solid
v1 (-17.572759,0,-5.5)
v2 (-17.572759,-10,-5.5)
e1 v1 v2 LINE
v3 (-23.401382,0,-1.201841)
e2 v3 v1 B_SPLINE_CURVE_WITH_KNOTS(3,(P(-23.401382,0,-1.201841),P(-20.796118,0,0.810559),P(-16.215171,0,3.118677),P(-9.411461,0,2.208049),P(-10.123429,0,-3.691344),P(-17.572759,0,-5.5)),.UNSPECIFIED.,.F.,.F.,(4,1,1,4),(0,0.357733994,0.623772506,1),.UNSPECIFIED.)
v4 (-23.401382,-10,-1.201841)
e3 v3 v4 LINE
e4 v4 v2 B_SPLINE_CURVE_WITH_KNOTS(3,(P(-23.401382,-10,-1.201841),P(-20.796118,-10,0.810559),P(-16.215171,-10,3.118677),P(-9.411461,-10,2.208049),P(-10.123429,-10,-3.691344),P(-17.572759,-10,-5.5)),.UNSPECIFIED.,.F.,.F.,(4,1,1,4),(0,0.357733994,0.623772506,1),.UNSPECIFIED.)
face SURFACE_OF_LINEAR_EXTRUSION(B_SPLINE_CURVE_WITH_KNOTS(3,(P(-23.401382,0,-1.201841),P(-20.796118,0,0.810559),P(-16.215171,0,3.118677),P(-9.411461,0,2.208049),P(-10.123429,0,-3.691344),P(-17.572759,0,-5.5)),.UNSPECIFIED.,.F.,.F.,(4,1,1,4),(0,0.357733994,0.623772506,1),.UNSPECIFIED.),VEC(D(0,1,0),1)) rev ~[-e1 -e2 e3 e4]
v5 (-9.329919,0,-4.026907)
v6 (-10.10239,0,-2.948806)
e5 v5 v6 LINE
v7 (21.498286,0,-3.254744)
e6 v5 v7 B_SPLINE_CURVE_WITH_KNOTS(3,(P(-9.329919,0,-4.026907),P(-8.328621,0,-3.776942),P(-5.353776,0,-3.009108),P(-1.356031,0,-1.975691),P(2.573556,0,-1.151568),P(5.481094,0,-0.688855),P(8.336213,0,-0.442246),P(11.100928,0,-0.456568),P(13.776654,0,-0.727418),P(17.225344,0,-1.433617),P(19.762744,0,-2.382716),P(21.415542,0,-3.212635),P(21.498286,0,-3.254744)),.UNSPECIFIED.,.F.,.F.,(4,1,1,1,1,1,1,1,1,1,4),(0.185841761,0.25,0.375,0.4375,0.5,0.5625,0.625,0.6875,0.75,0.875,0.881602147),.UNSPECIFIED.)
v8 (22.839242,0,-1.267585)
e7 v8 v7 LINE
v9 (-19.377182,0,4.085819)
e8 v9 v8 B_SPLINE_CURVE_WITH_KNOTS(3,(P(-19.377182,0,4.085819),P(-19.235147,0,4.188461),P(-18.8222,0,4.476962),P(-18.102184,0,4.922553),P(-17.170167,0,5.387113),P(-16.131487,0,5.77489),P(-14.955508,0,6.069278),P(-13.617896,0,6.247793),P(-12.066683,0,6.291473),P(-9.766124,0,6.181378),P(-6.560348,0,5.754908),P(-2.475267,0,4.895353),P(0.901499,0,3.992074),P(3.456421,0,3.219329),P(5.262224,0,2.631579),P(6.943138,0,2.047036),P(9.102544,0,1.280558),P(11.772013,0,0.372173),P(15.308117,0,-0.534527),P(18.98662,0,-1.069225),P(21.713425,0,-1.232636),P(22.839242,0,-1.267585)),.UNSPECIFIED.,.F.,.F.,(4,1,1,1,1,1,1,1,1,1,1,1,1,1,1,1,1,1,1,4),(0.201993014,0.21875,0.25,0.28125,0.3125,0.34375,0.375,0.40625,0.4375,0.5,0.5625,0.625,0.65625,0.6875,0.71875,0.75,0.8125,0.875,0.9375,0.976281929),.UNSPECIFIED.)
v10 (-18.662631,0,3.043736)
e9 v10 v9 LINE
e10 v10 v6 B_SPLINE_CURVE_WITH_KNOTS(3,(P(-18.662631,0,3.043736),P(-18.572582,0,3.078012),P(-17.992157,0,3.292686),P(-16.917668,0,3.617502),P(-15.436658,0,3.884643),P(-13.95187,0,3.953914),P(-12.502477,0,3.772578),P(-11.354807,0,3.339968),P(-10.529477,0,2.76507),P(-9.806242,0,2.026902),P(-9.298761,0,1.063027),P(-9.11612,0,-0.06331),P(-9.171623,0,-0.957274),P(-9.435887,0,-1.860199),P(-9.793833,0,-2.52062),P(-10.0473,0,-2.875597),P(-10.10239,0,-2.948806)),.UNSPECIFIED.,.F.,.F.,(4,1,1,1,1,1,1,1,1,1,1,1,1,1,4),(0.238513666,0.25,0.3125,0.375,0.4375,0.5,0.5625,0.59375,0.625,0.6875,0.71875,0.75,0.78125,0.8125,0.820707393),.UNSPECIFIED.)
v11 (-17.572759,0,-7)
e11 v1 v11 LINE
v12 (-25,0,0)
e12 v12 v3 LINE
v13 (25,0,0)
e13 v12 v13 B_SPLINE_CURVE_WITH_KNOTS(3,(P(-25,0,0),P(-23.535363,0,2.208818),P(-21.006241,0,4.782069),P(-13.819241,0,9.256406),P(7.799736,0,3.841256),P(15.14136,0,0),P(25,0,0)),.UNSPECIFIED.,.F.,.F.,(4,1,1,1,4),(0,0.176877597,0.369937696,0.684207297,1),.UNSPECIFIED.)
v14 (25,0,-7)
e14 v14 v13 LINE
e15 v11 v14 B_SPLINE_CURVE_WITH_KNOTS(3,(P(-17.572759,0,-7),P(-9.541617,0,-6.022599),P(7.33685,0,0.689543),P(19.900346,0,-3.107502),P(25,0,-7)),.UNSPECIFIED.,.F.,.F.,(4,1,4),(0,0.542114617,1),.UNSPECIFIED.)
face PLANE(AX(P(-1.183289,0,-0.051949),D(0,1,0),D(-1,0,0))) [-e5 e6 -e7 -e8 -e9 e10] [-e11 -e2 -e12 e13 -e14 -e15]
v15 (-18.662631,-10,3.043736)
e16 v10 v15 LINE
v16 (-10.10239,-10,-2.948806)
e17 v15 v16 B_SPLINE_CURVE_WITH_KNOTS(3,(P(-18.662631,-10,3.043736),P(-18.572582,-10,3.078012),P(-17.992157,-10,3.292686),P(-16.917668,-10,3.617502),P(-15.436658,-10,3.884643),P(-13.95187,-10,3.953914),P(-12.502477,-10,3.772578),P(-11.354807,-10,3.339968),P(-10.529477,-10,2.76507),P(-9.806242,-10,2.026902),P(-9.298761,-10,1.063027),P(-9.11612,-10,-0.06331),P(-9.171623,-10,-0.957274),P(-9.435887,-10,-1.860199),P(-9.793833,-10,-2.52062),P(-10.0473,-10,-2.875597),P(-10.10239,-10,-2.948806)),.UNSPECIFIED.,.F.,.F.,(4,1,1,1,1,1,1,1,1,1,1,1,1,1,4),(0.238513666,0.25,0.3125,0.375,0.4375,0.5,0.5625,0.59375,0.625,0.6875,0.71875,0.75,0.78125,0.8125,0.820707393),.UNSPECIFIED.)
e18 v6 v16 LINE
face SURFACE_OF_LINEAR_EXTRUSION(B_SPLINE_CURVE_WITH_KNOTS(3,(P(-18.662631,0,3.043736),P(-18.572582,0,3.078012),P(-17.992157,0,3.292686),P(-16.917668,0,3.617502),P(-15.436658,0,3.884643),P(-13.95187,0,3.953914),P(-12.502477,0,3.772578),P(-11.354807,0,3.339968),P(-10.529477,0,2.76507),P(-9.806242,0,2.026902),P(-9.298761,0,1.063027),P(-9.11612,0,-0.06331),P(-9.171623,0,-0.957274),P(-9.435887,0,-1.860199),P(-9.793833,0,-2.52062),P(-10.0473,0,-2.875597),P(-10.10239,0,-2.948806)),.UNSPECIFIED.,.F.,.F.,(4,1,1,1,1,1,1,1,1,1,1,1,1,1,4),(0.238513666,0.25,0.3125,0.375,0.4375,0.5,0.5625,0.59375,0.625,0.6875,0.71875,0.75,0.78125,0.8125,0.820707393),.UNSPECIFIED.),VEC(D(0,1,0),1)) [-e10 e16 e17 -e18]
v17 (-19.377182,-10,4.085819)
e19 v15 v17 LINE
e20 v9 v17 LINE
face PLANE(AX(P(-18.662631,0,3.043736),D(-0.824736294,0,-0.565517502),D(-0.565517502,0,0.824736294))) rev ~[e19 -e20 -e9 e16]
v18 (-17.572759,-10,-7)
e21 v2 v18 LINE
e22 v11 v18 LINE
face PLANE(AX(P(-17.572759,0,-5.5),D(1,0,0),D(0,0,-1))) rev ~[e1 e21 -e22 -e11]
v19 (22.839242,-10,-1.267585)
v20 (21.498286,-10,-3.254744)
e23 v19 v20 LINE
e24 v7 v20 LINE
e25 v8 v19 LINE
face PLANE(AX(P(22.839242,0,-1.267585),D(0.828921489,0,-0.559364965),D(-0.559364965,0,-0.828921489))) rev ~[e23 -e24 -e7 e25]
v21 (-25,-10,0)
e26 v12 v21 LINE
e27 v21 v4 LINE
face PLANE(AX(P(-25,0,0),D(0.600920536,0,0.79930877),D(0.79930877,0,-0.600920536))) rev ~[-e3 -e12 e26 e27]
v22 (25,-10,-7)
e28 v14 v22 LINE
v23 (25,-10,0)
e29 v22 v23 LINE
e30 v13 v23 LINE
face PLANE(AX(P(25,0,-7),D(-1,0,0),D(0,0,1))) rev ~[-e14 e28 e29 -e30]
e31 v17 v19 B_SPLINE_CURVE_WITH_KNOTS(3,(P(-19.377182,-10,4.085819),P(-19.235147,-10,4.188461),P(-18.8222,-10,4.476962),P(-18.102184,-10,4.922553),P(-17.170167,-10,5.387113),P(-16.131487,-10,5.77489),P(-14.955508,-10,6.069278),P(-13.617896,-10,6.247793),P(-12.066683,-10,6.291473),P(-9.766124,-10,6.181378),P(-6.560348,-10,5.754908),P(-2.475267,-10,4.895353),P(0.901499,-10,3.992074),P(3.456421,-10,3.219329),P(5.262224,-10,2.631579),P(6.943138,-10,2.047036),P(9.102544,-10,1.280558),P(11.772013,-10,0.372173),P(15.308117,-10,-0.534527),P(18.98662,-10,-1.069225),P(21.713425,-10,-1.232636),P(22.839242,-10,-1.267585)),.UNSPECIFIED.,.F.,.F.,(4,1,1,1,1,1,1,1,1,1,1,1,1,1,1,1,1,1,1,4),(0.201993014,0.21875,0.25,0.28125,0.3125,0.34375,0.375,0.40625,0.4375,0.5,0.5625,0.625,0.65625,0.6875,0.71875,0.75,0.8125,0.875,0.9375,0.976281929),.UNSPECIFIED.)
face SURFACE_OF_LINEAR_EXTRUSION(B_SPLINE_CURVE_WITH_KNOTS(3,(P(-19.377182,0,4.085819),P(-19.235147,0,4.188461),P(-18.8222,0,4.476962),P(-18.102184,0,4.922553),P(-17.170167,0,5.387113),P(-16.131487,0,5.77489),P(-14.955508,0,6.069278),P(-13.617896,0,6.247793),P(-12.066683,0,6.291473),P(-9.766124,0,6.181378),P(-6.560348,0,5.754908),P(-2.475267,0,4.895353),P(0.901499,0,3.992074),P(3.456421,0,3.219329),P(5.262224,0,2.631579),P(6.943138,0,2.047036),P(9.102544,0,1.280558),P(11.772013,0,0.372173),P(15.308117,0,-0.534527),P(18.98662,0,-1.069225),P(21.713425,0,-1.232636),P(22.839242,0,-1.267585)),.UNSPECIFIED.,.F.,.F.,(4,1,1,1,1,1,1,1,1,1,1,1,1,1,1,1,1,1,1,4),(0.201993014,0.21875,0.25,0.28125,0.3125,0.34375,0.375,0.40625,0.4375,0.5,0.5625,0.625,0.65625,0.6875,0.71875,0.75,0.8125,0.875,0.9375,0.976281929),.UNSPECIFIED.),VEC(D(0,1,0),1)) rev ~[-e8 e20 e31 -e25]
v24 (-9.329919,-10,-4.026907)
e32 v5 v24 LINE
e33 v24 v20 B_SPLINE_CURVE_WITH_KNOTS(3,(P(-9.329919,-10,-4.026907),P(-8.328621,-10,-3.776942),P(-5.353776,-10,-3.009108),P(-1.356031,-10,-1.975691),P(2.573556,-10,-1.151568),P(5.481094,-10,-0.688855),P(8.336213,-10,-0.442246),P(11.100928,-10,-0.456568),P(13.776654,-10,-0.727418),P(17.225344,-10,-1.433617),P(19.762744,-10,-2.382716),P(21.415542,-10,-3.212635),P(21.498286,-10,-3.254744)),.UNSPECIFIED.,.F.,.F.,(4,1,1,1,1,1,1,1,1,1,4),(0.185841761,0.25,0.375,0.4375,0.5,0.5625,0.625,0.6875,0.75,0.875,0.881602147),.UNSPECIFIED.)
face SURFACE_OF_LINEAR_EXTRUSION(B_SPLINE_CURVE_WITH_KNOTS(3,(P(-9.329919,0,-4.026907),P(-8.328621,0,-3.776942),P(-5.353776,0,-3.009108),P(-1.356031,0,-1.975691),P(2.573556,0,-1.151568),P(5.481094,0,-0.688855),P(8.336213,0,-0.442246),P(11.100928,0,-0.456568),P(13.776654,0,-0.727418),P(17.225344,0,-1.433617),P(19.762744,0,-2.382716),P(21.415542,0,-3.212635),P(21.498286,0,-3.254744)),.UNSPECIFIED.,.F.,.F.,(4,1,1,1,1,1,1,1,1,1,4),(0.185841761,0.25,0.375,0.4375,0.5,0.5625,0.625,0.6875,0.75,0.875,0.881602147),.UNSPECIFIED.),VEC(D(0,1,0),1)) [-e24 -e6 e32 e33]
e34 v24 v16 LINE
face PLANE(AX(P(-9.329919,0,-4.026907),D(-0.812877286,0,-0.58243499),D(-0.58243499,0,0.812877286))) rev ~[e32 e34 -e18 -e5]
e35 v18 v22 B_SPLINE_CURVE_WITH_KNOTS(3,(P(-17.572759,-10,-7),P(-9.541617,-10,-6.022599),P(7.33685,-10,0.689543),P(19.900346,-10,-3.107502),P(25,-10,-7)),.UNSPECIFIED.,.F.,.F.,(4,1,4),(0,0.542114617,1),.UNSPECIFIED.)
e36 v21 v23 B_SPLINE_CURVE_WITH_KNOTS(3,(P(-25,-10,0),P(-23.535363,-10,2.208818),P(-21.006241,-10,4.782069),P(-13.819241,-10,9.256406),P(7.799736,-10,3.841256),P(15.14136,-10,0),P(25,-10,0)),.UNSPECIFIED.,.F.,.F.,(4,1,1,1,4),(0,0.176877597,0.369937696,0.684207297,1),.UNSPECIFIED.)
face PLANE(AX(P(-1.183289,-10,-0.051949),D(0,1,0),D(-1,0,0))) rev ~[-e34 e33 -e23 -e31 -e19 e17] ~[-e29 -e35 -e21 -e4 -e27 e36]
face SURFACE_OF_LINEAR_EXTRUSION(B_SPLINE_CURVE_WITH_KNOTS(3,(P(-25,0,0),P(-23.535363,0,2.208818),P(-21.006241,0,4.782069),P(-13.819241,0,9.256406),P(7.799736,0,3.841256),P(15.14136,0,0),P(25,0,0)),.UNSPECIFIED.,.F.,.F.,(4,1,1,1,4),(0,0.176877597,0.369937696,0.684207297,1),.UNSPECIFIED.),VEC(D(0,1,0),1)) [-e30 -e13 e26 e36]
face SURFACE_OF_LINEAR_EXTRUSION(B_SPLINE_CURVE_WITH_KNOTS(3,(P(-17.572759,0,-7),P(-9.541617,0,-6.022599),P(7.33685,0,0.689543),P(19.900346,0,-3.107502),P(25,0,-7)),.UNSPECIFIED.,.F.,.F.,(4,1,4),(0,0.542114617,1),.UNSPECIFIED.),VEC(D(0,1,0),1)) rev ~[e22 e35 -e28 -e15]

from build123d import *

# Parameters (mm, degrees)
F1_DEPTH = 10


# Not quite as in the source:
# - ends of sketch curves that miss each other by under 0.0002 mm in the source are joined
# - the dataset's text gives a spline's control points without its knots; the knots are read off the source's solid


with BuildPart() as f1:
    # F0 (on Front) → F1 (new body)
    with BuildSketch(Plane.XZ):
        with BuildLine():
            add(Edge.make_bspline(
                [(-25, 0), (-23.5353633761, 2.2088184487), (-21.0062414356, 4.7820689833), (-13.8192409759, 9.2564060733), (7.7997359992, 3.8412558696), (15.1413595304, 0), (25, 0)],
                knots=[0, 0, 0, 0, 0.176877597, 0.369937696, 0.6842072965, 1, 1, 1, 1], degree=3))
            Line((-25, 0), (-23.4013824598, -1.2018410711))
            add(Edge.make_bspline(
                [(-23.4013824598, -1.2018410711), (-20.7961176234, 0.8105589099), (-16.2151711553, 3.1186773641), (-9.4114614583, 2.2080487325), (-10.1234289262, -3.6913444212), (-17.5727587193, -5.5)],
                knots=[0, 0, 0, 0, 0.3577339943, 0.6237725059, 1, 1, 1, 1], degree=3))
            Line((-17.5727587193, -5.5), (-17.5727587193, -7))
            add(Edge.make_bspline(
                [(-17.5727587193, -7), (-9.5416165347, -6.0225988186), (7.3368503694, 0.6895433506), (19.9003461748, -3.1075021252), (25, -7)],
                knots=[0, 0, 0, 0, 0.5421146173, 1, 1, 1, 1], degree=3))
            Line((25, -7), (25, 0))
        make_face()
        with BuildLine():
            Line((-18.6626309713, 3.0437360985), (-19.37718185, 4.085818865))
            add(Edge.make_bspline(
                [(-19.37718185, 4.085818865), (-19.2351469903, 4.1884605588), (-18.8222001915, 4.476962296), (-18.1021841377, 4.9225532755), (-17.1701670507, 5.3871128646), (-16.1314871306, 5.7748903375), (-14.9555077334, 6.0692782464), (-13.6178958905, 6.247793332), (-12.0666825691, 6.2914734797), (-9.766124237, 6.1813777311), (-6.5603478578, 5.7549083191), (-2.4752672416, 4.8953532484), (0.9014991571, 3.9920741444), (3.4564214075, 3.2193291581), (5.26222423, 2.6315789588), (6.9431379993, 2.0470359162), (9.1025443307, 1.2805575784), (11.7720133473, 0.3721732526), (15.3081169524, -0.5345270337), (18.9866204844, -1.0692247139), (21.7134251241, -1.2326363335), (22.8392417874, -1.2675846816)],
                knots=[0.2019930137, 0.2019930137, 0.2019930137, 0.2019930137, 0.21875, 0.25, 0.28125, 0.3125, 0.34375, 0.375, 0.40625, 0.4375, 0.5, 0.5625, 0.625, 0.65625, 0.6875, 0.71875, 0.75, 0.8125, 0.875, 0.9375, 0.9762819293, 0.9762819293, 0.9762819293, 0.9762819293], degree=3))
            Line((22.8392417874, -1.2675846816), (21.4982855177, -3.2547442942))
            add(Edge.make_bspline(
                [(-9.3299190223, -4.026907105), (-8.3286212906, -3.7769416853), (-5.3537756133, -3.0091078031), (-1.3560313783, -1.9756906659), (2.573556358, -1.1515681653), (5.4810935362, -0.6888547782), (8.3362134892, -0.4422460036), (11.1009276127, -0.4565682672), (13.7766541289, -0.7274180604), (17.2253435912, -1.4336165841), (19.7627439648, -2.3827163169), (21.4155417012, -3.2126347425), (21.4982855177, -3.2547442942)],
                knots=[0.1858417609, 0.1858417609, 0.1858417609, 0.1858417609, 0.25, 0.375, 0.4375, 0.5, 0.5625, 0.625, 0.6875, 0.75, 0.875, 0.8816021473, 0.8816021473, 0.8816021473, 0.8816021473], degree=3))
            Line((-9.3299190223, -4.026907105), (-10.1023896224, -2.948806003))
            add(Edge.make_bspline(
                [(-18.6626309713, 3.0437360985), (-18.5725818066, 3.0780117008), (-17.99215712, 3.2926858769), (-16.9176681891, 3.6175018842), (-15.4366583445, 3.8846431492), (-13.9518702414, 3.9539138632), (-12.5024766902, 3.7725777912), (-11.354806853, 3.3399679954), (-10.5294772781, 2.7650699008), (-9.8062415879, 2.0269023954), (-9.2987612179, 1.0630274045), (-9.1161197289, -0.0633099369), (-9.1716226788, -0.9572739007), (-9.435887283, -1.860198698), (-9.7938332887, -2.5206201828), (-10.0472997743, -2.8755973617), (-10.1023896224, -2.948806003)],
                knots=[0.2385136662, 0.2385136662, 0.2385136662, 0.2385136662, 0.25, 0.3125, 0.375, 0.4375, 0.5, 0.5625, 0.59375, 0.625, 0.6875, 0.71875, 0.75, 0.78125, 0.8125, 0.8207073926, 0.8207073926, 0.8207073926, 0.8207073926], degree=3))
        make_face(mode=Mode.SUBTRACT)
    extrude(amount=F1_DEPTH)


solid = f1.part
